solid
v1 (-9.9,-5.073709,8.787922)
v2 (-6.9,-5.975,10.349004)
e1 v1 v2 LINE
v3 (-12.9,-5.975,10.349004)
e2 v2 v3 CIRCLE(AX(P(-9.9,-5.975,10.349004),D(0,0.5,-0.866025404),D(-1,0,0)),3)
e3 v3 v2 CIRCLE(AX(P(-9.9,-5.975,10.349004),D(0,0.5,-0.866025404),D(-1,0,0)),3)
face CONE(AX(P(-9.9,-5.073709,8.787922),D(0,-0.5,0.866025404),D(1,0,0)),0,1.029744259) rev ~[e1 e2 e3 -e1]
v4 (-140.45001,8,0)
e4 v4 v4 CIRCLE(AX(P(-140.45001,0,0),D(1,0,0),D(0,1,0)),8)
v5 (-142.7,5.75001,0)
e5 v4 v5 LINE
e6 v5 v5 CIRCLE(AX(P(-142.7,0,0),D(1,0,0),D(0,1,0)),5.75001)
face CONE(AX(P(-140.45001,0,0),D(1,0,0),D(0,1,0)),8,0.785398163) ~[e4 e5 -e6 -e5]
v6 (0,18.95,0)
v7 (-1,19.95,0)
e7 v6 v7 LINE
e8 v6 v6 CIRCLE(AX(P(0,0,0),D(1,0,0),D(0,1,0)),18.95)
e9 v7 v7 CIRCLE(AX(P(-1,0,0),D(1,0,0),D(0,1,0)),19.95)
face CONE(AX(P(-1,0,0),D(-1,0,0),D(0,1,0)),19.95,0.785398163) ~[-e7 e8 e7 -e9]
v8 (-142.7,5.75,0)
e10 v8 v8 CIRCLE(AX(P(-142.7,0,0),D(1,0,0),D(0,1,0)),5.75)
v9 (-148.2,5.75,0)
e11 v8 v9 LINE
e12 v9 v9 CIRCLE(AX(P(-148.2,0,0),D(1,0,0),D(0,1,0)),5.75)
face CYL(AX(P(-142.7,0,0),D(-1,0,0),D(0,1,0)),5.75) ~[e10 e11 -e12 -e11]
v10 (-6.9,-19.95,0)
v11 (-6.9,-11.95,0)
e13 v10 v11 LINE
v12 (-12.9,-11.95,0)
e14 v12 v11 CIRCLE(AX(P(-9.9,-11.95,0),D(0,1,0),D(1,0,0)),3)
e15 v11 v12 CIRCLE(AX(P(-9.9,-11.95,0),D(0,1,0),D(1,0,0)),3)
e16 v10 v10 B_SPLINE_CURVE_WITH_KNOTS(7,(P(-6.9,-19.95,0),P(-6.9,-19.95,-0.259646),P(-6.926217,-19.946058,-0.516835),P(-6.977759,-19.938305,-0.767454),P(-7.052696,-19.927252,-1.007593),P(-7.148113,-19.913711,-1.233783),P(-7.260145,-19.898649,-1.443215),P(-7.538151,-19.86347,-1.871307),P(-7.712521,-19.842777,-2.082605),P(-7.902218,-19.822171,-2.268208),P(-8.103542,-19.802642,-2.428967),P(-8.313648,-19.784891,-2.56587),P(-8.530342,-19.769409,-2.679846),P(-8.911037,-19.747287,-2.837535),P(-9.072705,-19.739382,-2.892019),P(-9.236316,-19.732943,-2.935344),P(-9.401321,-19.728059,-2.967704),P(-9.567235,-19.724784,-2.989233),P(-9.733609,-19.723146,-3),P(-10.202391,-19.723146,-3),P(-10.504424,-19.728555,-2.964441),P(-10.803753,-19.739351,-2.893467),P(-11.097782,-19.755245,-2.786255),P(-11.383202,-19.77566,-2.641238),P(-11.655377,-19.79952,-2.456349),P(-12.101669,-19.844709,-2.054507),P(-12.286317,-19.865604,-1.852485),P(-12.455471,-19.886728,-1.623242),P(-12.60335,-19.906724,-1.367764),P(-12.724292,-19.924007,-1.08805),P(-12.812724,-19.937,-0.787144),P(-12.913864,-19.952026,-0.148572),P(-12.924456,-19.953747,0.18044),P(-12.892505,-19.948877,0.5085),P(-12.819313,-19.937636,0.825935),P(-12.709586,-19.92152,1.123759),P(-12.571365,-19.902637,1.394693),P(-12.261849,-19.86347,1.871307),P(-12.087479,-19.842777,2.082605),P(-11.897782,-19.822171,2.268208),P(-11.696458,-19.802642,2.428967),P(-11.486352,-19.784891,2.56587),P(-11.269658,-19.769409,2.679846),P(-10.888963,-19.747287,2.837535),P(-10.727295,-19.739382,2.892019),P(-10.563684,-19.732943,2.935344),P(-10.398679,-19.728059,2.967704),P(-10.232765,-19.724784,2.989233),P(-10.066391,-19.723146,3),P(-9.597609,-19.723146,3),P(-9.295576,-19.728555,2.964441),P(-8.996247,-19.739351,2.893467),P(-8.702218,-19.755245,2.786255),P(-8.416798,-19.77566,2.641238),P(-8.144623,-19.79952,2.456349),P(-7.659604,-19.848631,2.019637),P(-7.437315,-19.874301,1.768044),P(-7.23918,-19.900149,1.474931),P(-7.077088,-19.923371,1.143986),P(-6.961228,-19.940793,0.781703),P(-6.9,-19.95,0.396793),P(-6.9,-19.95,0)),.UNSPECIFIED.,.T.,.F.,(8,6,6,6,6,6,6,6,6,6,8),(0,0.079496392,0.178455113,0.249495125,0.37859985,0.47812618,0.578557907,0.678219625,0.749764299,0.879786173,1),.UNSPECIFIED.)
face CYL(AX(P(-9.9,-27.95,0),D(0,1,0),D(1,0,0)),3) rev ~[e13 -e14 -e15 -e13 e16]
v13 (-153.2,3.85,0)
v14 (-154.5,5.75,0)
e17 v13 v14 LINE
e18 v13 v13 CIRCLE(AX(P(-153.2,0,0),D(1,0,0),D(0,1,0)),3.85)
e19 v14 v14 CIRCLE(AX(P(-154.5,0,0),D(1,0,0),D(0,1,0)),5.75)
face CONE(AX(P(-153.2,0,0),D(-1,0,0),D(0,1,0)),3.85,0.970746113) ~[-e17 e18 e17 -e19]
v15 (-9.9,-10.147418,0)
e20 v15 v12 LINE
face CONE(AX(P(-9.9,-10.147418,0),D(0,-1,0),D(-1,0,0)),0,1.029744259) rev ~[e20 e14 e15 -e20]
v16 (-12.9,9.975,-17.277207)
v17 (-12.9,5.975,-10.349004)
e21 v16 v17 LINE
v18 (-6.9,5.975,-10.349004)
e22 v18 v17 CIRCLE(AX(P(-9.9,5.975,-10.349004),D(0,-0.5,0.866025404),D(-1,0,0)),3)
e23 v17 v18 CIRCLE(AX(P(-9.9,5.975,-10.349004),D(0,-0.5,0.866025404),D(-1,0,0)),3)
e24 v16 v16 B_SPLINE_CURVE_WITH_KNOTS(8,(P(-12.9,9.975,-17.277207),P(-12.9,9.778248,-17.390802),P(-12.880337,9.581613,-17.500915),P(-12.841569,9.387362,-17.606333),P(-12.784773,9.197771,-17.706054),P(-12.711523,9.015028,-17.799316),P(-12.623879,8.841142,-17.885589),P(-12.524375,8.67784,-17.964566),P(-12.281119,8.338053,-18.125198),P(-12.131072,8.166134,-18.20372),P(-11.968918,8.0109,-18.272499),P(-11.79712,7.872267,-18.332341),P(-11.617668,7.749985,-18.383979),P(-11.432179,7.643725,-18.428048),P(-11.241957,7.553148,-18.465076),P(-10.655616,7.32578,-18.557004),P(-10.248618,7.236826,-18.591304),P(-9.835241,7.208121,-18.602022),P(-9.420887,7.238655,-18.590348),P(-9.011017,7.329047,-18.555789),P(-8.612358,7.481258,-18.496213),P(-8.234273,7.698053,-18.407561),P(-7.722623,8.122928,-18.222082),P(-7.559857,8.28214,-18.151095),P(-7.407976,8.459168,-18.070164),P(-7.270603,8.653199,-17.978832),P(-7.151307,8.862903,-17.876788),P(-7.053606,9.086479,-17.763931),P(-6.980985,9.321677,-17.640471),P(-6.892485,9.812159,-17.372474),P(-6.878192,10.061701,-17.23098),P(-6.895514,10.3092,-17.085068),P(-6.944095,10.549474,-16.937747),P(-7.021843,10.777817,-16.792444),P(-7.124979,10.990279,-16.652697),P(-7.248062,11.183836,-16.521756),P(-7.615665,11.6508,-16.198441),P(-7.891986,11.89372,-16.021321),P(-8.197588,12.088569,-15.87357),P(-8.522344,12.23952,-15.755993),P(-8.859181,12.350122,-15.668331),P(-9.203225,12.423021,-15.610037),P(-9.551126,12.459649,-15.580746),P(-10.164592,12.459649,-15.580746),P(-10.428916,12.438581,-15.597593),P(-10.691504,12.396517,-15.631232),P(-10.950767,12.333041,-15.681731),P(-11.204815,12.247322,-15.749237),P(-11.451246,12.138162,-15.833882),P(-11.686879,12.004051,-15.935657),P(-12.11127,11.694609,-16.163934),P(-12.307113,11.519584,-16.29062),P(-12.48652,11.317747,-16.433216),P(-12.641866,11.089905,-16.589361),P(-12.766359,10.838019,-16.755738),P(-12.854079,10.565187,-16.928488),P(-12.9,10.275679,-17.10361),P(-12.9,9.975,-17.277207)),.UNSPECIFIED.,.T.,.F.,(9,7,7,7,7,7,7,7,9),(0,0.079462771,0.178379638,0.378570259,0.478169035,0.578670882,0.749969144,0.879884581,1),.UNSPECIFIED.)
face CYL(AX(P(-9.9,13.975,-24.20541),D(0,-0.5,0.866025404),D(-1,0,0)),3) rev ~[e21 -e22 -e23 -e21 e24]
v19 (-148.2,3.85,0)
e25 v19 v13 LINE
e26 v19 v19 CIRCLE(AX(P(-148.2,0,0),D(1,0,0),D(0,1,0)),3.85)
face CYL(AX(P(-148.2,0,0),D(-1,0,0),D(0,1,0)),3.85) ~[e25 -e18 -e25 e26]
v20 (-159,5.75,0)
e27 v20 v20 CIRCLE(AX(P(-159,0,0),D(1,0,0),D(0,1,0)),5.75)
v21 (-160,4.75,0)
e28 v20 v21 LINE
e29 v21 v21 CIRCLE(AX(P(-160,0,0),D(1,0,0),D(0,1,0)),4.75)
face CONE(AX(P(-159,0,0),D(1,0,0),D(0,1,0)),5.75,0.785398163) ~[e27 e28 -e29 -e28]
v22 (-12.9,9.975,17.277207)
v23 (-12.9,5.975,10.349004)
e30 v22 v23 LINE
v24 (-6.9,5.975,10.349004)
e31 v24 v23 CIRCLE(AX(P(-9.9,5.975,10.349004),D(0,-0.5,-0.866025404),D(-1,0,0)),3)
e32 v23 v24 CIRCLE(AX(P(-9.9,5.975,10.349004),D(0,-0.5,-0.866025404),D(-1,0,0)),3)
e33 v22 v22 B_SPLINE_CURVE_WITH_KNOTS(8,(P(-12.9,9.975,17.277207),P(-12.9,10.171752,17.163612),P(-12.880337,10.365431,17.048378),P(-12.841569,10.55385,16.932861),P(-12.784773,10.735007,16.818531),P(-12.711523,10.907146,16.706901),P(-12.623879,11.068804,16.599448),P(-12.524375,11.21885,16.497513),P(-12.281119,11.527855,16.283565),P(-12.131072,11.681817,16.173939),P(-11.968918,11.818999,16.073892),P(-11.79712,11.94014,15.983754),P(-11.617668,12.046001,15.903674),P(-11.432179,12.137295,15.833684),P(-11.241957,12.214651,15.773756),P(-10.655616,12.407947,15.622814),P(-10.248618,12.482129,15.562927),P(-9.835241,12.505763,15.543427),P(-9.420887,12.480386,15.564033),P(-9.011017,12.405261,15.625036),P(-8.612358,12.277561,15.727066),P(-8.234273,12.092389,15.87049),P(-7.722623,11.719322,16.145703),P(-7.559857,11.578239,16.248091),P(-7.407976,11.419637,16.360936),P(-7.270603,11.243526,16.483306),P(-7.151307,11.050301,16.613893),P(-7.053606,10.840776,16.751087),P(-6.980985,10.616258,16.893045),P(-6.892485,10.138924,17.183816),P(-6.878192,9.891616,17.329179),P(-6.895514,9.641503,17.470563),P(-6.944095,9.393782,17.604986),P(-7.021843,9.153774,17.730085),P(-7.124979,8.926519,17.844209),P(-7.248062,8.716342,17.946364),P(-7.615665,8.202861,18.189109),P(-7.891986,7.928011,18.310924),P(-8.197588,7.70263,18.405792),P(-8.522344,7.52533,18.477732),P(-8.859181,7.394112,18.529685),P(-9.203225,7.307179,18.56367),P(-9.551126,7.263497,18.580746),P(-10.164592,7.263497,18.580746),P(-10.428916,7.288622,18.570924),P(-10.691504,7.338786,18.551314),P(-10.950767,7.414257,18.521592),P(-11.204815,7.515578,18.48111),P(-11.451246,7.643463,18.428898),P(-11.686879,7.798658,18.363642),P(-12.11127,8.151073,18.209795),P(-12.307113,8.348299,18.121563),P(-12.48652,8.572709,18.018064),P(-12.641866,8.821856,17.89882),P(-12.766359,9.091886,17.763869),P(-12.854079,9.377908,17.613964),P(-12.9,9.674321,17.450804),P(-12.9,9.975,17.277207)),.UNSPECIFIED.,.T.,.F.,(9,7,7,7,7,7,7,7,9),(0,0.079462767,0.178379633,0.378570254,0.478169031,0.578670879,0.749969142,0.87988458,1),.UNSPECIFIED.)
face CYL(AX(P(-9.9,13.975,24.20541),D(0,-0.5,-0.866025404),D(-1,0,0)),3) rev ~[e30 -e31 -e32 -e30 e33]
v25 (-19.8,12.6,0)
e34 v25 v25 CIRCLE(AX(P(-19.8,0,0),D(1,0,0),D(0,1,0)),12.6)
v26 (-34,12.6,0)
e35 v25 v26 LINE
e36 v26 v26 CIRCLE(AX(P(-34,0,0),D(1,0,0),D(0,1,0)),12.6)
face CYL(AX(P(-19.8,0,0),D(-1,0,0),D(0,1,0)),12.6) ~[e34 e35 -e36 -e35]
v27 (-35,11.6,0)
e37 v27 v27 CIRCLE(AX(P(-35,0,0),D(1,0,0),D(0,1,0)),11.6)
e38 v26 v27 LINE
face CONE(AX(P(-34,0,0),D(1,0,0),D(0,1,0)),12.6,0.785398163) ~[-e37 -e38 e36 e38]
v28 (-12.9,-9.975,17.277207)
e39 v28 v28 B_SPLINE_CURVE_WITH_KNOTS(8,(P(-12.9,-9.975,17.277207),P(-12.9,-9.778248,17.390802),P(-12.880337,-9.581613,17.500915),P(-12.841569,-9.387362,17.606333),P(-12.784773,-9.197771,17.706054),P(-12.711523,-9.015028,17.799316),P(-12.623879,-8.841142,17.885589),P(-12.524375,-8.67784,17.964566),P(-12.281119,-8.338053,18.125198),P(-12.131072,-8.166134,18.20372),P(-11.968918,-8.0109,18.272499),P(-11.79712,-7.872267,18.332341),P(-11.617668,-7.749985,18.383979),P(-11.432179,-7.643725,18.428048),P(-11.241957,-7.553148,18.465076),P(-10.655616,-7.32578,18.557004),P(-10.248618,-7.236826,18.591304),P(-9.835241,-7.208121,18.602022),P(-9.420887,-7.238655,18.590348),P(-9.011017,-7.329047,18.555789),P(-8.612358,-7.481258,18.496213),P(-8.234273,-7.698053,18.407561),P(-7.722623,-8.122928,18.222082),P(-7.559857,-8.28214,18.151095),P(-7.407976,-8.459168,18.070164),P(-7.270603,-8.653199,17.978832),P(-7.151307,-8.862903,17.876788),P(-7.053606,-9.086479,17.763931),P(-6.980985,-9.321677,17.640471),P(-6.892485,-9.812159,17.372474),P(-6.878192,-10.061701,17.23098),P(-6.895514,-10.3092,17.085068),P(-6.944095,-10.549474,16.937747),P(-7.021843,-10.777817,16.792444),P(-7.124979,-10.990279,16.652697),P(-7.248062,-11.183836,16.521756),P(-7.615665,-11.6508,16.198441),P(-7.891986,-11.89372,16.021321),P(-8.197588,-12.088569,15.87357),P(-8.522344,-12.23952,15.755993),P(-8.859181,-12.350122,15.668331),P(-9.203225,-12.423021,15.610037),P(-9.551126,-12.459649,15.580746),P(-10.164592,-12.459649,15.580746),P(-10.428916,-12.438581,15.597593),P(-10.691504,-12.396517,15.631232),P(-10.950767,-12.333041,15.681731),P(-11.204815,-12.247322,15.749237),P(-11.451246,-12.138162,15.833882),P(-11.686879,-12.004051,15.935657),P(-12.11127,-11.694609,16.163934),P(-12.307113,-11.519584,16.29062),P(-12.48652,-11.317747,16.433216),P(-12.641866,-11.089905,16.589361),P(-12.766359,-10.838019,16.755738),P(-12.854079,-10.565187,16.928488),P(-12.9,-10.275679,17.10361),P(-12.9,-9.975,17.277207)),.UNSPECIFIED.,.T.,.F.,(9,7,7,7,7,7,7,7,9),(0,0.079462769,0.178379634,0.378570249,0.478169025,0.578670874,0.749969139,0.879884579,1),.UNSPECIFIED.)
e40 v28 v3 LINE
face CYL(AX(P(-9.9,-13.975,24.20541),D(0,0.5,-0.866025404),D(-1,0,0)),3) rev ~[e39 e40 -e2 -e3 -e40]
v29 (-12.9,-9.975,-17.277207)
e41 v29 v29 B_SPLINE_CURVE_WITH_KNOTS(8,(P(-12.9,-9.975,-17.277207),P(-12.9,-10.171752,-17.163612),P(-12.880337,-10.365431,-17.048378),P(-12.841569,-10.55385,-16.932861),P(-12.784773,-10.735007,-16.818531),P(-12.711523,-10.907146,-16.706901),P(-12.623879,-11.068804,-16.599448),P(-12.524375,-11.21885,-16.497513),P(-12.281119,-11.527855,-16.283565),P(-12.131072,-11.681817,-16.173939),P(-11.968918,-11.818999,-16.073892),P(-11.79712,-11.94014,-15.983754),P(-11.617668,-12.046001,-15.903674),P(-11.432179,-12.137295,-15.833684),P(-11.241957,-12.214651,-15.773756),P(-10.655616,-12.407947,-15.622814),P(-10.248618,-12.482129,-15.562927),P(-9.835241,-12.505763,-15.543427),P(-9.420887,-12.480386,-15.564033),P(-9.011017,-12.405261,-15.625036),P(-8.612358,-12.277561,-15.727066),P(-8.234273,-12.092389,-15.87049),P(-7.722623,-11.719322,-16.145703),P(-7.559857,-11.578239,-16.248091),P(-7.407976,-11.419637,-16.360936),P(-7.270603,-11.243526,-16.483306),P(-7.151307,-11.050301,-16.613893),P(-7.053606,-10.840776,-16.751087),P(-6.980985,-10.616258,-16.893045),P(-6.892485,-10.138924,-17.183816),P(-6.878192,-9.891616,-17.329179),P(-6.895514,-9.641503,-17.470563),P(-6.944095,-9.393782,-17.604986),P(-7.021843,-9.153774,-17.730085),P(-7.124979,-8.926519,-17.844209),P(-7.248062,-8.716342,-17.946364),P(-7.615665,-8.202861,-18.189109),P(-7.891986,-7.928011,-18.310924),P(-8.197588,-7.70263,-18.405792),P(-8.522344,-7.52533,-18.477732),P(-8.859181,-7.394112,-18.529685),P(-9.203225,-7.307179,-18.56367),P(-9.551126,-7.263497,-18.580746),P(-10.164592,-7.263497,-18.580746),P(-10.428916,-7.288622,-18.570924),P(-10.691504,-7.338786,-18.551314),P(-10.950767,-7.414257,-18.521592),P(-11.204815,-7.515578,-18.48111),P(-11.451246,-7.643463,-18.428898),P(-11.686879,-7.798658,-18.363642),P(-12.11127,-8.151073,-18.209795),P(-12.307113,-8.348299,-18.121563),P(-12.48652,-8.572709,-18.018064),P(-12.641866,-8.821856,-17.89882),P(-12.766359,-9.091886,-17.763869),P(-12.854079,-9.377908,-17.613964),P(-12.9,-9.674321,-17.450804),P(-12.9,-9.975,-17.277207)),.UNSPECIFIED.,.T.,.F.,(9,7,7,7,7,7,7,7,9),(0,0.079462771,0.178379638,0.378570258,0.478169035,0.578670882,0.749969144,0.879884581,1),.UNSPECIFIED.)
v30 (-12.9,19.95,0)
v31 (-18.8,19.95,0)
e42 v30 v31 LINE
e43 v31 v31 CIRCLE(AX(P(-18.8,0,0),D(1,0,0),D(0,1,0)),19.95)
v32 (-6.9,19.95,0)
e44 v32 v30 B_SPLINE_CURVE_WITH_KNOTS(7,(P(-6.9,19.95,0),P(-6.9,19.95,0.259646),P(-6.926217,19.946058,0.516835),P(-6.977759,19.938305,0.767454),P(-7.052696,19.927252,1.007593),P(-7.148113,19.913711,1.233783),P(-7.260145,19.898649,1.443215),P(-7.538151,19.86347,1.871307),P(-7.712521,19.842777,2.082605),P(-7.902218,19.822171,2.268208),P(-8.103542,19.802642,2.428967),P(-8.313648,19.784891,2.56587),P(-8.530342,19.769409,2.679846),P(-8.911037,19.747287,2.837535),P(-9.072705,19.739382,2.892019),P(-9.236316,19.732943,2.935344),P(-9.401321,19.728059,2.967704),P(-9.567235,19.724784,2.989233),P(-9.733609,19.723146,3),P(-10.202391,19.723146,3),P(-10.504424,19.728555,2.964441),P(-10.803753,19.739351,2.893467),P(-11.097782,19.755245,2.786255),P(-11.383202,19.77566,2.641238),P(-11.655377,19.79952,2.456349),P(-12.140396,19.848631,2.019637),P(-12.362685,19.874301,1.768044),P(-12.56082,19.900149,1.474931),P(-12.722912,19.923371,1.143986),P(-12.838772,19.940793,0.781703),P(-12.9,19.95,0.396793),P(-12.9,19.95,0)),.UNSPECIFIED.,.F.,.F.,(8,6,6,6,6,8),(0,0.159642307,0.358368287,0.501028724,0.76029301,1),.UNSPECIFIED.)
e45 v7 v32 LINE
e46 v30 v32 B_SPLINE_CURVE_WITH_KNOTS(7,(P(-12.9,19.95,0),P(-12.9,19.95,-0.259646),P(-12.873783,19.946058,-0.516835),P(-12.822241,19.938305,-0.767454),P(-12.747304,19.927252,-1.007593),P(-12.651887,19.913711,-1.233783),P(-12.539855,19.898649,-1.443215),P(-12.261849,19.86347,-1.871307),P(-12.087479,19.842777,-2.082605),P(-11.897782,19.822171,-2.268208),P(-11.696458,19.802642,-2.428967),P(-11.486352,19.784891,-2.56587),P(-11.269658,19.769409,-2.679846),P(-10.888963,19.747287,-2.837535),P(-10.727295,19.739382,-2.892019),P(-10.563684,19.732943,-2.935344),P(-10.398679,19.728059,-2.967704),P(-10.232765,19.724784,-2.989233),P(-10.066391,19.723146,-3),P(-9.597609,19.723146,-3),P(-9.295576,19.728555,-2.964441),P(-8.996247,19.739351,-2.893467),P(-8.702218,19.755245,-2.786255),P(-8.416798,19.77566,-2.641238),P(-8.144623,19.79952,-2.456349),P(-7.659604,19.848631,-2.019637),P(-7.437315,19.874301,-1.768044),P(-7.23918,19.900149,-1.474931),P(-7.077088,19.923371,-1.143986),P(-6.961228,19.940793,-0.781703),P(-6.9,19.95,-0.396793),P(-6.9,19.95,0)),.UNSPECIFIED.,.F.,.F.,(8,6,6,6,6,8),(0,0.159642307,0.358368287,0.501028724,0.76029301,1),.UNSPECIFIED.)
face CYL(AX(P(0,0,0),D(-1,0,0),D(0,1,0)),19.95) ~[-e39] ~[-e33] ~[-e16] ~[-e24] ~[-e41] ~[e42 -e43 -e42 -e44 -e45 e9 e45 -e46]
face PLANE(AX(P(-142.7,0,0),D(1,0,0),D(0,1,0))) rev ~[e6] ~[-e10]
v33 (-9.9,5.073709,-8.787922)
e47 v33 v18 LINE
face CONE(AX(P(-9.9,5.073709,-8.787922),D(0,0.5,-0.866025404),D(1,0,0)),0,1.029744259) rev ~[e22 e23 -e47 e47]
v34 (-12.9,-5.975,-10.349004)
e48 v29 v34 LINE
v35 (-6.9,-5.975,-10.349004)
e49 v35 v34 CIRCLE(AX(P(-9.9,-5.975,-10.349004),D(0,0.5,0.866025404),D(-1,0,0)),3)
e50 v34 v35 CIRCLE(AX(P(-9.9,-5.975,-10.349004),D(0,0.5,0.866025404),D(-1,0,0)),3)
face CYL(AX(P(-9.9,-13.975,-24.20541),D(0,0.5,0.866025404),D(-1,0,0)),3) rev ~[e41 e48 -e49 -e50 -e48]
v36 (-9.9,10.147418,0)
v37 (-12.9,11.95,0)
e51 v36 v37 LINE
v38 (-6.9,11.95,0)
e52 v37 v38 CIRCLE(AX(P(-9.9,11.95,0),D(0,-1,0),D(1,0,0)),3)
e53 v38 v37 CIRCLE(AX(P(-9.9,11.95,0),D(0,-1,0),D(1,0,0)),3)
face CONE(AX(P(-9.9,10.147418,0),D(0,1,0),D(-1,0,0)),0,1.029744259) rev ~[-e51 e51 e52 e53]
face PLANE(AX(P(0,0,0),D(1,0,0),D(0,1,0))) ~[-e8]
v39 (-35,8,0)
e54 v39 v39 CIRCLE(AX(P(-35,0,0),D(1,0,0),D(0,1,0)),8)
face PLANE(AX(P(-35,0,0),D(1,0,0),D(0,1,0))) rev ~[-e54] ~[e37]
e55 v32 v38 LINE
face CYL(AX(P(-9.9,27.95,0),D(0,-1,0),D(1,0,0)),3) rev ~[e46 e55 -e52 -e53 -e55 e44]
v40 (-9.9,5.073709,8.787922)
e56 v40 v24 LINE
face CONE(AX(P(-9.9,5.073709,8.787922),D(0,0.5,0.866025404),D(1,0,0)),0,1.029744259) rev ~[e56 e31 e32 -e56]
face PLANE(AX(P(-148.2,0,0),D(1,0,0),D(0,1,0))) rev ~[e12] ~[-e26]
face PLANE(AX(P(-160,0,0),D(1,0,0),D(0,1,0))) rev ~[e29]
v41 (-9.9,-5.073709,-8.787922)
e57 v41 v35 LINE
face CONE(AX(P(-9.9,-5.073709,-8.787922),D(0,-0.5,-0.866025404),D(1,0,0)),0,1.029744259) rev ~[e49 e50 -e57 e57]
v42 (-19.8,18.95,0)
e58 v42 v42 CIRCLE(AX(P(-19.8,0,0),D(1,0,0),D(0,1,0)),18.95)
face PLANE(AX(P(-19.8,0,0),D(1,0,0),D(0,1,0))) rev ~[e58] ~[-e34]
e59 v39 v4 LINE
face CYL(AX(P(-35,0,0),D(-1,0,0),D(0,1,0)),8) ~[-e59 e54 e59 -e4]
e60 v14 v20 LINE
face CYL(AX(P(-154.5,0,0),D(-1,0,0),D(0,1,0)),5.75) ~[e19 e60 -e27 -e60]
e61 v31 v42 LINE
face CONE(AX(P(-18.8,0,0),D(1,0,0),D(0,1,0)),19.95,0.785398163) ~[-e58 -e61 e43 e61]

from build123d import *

# Parameters (mm, degrees)
F2_SIZE   = 1
F3_SIZE   = 2.24999
F17_D     = 6
F17_DEPTH = 8
F17_TIP   = 1.8025818571
F18_D     = 6
F18_DEPTH = 8
F18_TIP   = 1.8025818571
F19_D     = 6
F19_DEPTH = 8
F19_TIP   = 1.8025818571
F20_D     = 6
F20_DEPTH = 8
F20_TIP   = 1.8025818571
F21_D     = 6
F21_DEPTH = 8
F21_TIP   = 1.8025818571
F22_D     = 6
F22_DEPTH = 8
F22_TIP   = 1.8025818571


# Not quite as in the source:
# - a fillet or chamfer is up to 0.001 mm smaller than in the source, because OpenCascade refuses the exact size


with BuildPart() as f1:
    # F0 (on Top) → F1 (revolve)
    with BuildSketch(Plane.XY):
        Polygon((-160, 0), (0, 0), (0, 19.95), (-19.8, 19.95), (-19.8, 12.6), (-35, 12.6), (-35, 8), (-142.7, 8), (-142.7, 5.75), (-148.2, 5.75), (-148.2, 3.85), (-153.2, 3.85), (-154.5, 5.75), (-160, 5.75), align=None)
    revolve(axis=Axis((-80, 0, 0), (1, 0, 0)))

    # F2
    f2_edges = [f1.edges().sort_by_distance(p)[0] for p in [
        (-160, -5.75, 0),
        (0, -19.95, 0),
        (-35, -12.6, 0),
        (-19.8, -19.95, 0),
    ]]
    chamfer(f2_edges, length=F2_SIZE)

    # F3 (size 2.25 in the source; OpenCascade refuses exactly that, so slightly less here)
    f3_edges = [f1.edges().sort_by_distance(p)[0] for p in [
        (-142.7, -8, 0),
    ]]
    chamfer(f3_edges, length=F3_SIZE)

    # F17
    with Locations(Plane(origin=(0, -19.95, 0), x_dir=(-1, 0, 0), z_dir=(0, -1, 0))):
        with Locations((9.9, 0)):
            Hole(F17_D / 2, depth=F17_DEPTH)
            with Locations((0, 0, -(F17_DEPTH + F17_TIP / 2))):  # 118° drill point
                Cone(0, F17_D / 2, F17_TIP, mode=Mode.SUBTRACT)

    # F18
    with Locations(Plane(origin=(0, -9.975, 17.2772068055), x_dir=(1, 0, 0), z_dir=(0, -0.5, 0.8660254038))):
        with Locations((-9.9, 0)):
            Hole(F18_D / 2, depth=F18_DEPTH)
            with Locations((0, 0, -(F18_DEPTH + F18_TIP / 2))):  # 118° drill point
                Cone(0, F18_D / 2, F18_TIP, mode=Mode.SUBTRACT)

    # F19
    with Locations(Plane(origin=(0, 9.975, 17.2772068055), x_dir=(1, 0, 0), z_dir=(0, 0.5, 0.8660254038))):
        with Locations((-9.9, 0)):
            Hole(F19_D / 2, depth=F19_DEPTH)
            with Locations((0, 0, -(F19_DEPTH + F19_TIP / 2))):  # 118° drill point
                Cone(0, F19_D / 2, F19_TIP, mode=Mode.SUBTRACT)

    # F20
    with Locations(Plane(origin=(0, 19.95, 0), x_dir=(-1, 0, 0), z_dir=(0, 1, 0))):
        with Locations((9.9, 0)):
            Hole(F20_D / 2, depth=F20_DEPTH)
            with Locations((0, 0, -(F20_DEPTH + F20_TIP / 2))):  # 118° drill point
                Cone(0, F20_D / 2, F20_TIP, mode=Mode.SUBTRACT)

    # F21
    with Locations(Plane(origin=(0, 9.975, -17.2772068055), x_dir=(1, 0, 0), z_dir=(0, 0.5, -0.8660254038))):
        with Locations((-9.9, 0)):
            Hole(F21_D / 2, depth=F21_DEPTH)
            with Locations((0, 0, -(F21_DEPTH + F21_TIP / 2))):  # 118° drill point
                Cone(0, F21_D / 2, F21_TIP, mode=Mode.SUBTRACT)

    # F22
    with Locations(Plane(origin=(0, -9.975, -17.2772068055), x_dir=(1, 0, 0), z_dir=(0, -0.5, -0.8660254038))):
        with Locations((-9.9, 0)):
            Hole(F22_D / 2, depth=F22_DEPTH)
            with Locations((0, 0, -(F22_DEPTH + F22_TIP / 2))):  # 118° drill point
                Cone(0, F22_D / 2, F22_TIP, mode=Mode.SUBTRACT)


solid = f1.part
